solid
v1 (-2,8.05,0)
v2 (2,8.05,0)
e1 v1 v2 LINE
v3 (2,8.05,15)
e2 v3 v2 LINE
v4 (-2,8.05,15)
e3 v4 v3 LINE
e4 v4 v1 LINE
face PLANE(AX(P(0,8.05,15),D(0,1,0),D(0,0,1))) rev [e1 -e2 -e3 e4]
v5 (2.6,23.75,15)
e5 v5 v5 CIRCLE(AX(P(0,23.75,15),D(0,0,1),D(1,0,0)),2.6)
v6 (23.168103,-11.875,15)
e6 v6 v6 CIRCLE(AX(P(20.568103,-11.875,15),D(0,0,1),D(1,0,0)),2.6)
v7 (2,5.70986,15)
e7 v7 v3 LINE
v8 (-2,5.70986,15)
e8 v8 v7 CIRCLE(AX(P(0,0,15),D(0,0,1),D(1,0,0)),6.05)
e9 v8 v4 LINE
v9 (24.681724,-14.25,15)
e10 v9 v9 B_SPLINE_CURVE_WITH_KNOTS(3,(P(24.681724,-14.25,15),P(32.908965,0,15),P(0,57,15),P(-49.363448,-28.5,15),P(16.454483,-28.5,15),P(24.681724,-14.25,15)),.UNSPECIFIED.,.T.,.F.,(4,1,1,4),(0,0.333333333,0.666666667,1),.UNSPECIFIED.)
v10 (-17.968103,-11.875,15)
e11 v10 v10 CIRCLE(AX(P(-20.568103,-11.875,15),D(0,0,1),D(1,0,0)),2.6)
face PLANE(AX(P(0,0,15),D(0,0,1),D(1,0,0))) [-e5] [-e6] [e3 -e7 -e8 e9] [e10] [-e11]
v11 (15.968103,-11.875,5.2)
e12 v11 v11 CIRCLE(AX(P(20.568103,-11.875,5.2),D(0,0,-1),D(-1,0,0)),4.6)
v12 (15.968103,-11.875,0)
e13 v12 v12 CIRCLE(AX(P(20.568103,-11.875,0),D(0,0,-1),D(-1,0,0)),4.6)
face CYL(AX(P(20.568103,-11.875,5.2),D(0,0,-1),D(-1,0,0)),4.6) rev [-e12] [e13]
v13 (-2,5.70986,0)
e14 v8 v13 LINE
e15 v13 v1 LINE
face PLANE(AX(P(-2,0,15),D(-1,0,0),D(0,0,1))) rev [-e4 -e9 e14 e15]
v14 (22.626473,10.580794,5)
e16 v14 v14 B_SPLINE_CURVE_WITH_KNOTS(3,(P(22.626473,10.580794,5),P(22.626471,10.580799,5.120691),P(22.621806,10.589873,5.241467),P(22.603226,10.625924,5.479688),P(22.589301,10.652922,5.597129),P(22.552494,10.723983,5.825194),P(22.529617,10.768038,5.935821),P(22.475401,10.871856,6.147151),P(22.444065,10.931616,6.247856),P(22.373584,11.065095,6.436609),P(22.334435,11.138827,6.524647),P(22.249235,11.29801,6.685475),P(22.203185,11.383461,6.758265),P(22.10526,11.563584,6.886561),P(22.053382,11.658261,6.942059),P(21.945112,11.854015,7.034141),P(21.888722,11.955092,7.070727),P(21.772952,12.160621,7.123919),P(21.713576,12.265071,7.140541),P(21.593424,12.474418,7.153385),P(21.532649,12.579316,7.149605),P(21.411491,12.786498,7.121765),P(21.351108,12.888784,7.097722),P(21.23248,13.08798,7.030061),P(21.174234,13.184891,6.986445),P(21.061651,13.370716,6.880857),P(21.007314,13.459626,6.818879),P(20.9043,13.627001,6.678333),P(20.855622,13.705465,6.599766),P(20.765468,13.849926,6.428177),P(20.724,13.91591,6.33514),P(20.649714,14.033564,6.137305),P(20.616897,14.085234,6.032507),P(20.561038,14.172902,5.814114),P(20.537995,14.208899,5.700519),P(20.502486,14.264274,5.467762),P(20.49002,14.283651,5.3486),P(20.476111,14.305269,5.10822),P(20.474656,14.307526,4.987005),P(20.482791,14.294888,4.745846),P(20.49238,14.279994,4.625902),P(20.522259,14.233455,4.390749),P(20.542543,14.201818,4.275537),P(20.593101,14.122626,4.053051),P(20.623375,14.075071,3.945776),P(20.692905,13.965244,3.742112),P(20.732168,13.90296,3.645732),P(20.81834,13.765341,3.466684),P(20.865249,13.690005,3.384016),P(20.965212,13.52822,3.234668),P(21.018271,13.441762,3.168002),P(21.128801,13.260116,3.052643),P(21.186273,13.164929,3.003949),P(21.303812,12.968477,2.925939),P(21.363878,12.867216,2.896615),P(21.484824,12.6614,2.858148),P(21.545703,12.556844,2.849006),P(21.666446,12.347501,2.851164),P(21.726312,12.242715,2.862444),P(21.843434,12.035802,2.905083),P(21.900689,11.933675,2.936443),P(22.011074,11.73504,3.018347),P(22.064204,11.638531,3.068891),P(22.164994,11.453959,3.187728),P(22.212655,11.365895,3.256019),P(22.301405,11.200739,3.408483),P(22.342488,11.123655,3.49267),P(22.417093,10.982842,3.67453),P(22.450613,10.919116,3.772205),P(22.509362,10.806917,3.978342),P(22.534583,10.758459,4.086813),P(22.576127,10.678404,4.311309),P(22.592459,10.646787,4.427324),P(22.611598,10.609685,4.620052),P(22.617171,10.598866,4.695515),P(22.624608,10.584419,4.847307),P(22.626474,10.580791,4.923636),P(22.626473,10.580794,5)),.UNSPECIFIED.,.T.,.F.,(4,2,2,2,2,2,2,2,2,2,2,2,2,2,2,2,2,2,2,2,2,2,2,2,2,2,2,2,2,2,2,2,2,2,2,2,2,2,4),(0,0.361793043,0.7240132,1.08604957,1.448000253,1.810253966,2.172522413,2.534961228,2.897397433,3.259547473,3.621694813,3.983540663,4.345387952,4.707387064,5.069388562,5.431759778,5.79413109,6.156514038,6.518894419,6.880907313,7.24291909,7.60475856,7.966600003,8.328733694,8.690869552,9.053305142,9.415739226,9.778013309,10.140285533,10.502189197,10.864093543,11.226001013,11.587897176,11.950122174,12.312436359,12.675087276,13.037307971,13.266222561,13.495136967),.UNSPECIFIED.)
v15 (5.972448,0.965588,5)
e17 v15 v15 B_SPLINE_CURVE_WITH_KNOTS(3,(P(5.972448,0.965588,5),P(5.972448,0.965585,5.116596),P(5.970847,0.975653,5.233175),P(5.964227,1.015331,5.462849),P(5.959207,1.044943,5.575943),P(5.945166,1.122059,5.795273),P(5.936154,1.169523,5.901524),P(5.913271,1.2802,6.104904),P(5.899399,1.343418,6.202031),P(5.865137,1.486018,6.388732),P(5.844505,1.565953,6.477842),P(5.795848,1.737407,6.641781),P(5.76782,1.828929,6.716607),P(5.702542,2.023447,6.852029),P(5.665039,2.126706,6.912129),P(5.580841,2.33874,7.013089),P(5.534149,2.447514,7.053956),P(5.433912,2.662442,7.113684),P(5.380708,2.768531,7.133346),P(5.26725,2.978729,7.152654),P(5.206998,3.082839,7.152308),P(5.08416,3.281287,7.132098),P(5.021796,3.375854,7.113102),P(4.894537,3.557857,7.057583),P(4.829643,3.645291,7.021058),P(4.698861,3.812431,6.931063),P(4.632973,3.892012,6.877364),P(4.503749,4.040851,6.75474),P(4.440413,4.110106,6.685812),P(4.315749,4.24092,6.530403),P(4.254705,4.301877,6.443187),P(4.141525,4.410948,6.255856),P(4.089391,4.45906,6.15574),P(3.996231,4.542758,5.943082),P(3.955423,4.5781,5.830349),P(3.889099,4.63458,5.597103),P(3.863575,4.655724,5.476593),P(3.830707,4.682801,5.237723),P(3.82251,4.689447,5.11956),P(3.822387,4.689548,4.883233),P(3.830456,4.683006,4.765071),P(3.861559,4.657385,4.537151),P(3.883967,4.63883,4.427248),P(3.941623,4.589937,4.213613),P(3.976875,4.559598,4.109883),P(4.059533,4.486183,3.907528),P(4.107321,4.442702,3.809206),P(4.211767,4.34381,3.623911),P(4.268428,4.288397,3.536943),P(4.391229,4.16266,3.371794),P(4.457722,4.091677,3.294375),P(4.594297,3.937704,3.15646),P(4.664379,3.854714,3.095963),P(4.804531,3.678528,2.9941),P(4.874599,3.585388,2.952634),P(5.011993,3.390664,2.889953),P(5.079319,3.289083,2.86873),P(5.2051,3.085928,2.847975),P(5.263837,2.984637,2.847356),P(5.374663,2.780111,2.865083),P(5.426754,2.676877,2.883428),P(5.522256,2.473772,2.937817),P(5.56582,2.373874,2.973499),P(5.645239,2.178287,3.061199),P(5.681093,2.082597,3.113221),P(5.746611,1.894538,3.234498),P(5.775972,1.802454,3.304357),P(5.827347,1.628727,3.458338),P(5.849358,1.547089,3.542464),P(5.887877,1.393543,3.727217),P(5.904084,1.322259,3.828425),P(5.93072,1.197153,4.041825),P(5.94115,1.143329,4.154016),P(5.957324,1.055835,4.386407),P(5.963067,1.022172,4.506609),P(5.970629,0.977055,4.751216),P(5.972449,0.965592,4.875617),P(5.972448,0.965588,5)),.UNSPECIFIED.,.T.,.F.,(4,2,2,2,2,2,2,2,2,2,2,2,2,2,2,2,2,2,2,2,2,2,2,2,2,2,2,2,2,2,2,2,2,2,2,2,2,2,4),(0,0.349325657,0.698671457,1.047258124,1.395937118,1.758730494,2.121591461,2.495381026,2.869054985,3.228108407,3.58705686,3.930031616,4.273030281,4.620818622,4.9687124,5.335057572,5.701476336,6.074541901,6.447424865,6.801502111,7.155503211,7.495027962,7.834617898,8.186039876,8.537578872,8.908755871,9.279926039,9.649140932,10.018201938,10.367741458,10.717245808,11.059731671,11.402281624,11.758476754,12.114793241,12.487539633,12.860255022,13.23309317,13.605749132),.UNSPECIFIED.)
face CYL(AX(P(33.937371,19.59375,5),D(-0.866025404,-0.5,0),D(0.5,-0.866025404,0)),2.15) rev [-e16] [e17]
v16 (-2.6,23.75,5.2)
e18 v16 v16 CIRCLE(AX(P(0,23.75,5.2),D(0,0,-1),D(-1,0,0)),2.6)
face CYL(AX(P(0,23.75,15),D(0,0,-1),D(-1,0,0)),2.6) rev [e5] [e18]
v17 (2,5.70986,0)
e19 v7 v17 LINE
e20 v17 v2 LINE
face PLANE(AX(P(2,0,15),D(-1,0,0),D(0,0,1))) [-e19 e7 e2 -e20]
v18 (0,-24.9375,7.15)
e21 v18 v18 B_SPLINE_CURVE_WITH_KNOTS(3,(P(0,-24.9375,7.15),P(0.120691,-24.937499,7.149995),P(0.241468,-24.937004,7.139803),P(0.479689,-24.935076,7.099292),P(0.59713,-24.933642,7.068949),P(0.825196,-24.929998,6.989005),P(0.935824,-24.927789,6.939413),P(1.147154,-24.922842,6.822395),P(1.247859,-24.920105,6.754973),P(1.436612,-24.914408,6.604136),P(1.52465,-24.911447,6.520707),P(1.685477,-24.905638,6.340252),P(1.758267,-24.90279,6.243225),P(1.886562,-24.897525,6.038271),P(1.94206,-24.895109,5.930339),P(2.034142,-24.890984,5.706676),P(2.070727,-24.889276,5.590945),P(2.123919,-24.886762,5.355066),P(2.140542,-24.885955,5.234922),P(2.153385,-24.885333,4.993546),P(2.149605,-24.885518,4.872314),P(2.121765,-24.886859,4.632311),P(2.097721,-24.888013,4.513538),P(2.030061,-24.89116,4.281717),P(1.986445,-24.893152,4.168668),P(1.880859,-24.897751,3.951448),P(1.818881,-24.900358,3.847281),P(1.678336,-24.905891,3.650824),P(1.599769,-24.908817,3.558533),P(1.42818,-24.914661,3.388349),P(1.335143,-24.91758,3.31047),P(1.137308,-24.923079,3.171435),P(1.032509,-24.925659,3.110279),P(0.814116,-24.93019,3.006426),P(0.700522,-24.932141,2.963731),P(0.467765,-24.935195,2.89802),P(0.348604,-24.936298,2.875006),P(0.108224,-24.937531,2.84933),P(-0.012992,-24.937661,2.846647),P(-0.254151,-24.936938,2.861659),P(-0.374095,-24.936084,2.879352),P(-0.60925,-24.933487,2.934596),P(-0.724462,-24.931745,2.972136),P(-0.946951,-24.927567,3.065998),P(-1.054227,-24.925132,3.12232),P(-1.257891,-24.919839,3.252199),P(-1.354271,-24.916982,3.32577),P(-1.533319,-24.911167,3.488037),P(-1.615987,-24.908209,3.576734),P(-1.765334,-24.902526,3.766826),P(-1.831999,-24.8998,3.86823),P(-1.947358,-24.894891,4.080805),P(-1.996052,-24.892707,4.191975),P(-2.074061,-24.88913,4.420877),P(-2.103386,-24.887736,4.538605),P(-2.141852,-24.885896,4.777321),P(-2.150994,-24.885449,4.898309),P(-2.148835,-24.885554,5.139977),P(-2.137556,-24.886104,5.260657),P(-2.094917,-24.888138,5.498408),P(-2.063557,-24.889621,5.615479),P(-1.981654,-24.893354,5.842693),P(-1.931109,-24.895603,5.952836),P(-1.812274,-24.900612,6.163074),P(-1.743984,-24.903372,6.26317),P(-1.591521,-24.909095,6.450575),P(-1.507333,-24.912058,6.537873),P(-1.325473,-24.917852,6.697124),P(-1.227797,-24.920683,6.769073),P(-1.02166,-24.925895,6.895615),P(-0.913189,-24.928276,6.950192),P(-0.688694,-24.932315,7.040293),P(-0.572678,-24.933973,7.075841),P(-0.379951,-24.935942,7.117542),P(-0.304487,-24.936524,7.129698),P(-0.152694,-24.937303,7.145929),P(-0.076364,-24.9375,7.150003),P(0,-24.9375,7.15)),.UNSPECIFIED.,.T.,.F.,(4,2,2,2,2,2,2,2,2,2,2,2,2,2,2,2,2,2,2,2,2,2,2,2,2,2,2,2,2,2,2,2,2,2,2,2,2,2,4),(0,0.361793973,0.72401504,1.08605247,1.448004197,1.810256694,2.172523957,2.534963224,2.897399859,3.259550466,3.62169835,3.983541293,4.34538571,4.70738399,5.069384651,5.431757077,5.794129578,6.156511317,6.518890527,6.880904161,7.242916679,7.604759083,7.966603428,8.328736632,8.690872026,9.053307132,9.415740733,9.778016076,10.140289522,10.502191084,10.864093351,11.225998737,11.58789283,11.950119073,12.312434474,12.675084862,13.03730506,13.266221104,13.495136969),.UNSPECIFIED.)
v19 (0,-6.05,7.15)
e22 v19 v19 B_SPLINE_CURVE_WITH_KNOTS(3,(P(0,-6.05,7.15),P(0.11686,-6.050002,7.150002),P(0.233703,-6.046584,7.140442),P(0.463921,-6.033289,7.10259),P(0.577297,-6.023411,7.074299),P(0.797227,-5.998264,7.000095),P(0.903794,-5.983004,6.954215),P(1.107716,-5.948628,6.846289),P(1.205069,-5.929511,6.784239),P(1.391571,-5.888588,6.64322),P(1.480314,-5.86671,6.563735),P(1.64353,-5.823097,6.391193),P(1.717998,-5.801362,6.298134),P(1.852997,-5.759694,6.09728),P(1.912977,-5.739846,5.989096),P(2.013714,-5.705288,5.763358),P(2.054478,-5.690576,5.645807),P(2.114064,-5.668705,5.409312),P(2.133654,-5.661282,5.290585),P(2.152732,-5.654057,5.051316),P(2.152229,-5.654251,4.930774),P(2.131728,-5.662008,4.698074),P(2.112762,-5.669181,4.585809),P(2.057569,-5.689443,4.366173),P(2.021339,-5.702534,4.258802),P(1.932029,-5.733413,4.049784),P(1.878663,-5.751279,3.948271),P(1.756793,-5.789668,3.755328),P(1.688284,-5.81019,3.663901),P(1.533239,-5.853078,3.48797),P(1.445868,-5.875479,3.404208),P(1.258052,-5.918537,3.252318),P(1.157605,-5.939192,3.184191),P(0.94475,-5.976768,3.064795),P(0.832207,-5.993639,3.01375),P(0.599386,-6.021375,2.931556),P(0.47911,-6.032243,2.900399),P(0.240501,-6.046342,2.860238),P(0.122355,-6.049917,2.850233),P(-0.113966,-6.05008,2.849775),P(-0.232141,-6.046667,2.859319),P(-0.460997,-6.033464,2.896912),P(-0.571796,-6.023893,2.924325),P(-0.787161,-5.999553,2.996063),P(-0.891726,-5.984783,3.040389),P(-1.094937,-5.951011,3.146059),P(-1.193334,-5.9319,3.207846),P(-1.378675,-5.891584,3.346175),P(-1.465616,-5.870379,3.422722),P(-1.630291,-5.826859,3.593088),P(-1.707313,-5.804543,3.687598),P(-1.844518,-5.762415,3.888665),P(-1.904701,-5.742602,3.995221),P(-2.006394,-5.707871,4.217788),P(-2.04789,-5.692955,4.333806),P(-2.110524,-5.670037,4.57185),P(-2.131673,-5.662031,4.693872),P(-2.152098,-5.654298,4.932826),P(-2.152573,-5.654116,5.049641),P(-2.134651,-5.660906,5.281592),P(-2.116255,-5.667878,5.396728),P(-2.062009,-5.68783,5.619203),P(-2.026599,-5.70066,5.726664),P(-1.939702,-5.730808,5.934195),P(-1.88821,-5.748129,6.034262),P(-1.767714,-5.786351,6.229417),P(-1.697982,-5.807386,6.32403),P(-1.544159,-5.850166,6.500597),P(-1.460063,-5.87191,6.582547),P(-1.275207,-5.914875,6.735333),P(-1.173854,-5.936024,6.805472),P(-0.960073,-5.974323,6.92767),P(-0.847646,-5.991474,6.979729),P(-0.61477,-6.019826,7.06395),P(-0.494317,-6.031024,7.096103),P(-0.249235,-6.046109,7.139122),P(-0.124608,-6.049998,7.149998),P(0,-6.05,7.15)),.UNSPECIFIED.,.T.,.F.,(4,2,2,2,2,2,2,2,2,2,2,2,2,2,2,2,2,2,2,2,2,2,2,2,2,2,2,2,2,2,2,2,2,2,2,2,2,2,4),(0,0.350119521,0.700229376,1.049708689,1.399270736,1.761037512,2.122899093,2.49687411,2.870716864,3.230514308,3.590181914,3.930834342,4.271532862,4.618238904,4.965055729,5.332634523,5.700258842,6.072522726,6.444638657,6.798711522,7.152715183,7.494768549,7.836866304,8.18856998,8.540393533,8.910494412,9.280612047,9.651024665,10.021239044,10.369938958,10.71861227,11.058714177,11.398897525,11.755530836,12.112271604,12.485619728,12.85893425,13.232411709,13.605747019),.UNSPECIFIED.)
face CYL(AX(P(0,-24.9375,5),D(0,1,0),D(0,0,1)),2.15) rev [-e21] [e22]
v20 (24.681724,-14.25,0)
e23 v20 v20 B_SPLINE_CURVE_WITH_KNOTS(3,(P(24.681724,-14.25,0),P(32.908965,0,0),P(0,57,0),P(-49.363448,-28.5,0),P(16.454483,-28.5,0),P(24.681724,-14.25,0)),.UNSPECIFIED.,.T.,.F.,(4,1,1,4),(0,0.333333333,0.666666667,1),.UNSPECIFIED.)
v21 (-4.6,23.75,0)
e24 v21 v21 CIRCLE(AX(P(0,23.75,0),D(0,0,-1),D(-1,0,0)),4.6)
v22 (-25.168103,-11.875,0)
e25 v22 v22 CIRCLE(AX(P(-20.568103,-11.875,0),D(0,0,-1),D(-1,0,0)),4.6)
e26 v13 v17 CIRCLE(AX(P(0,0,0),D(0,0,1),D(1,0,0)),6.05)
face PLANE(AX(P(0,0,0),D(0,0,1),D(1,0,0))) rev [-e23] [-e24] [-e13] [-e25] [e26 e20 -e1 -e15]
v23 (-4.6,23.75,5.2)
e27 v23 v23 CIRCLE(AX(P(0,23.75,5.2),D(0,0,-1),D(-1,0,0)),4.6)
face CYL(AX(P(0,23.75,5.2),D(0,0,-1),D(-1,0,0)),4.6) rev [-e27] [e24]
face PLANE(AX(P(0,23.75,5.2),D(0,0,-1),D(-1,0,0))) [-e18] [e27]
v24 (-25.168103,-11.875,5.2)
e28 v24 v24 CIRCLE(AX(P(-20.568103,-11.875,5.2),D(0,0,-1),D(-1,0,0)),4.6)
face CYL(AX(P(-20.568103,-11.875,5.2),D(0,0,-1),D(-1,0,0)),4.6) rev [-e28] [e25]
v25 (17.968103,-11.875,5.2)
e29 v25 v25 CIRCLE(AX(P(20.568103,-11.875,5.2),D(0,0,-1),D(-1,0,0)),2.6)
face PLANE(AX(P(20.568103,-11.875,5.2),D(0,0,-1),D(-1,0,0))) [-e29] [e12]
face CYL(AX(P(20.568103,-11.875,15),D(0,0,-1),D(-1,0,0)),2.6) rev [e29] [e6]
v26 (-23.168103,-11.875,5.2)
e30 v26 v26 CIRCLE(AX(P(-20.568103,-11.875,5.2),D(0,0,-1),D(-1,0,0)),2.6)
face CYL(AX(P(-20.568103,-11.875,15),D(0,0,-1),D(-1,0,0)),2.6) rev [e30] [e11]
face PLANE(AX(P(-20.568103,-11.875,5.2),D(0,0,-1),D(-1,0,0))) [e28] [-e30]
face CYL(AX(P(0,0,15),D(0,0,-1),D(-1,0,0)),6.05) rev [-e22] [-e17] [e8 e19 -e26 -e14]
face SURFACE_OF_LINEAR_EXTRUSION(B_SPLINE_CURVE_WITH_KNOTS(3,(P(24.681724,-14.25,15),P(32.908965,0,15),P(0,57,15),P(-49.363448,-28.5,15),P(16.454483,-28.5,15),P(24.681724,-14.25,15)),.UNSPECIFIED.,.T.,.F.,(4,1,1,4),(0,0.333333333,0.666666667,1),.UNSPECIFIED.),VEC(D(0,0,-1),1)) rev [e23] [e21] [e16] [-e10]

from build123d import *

# Parameters (mm, degrees)
SKETCH_1_R           = 2.6
EXTRUDE_1_DEPTH      = 15
SKETCH_13_R          = 2.15
CUT_EXTRUDE_10_DEPTH = 42.943414433
SKETCH_14_R          = 2.15
CUT_EXTRUDE_11_DEPTH = 42.943414433
SKETCH_15_R          = 4.6
CUT_EXTRUDE_12_DEPTH = 5.2


with BuildPart() as part:
    # ｽｹｯﾁ1 → ﾎﾞｽ - 押し出し1 (new body)
    with BuildSketch(Plane.XY):
        with BuildLine():
            add(Edge.make_bspline(
                [(24.681724008, -14.25), (32.908965344, 0), (-1.1e-08, 56.999999981), (-49.363447804, -28.499999633), (16.454482294, -28.500000089), (24.681724008, -14.25)],
                knots=[0, 0, 0, 0, 0.333333333, 0.666666668, 0.999999999, 0.999999999, 0.999999999, 0.999999999], degree=3))
        make_face()
        with Locations((-20.56810334, -11.875)):
            Circle(SKETCH_1_R, mode=Mode.SUBTRACT)
        with BuildLine():
            Line((-2, 5.709859893), (-2, 8.05))
            Line((-2, 8.05), (2, 8.05))
            Line((2, 8.05), (2, 5.709859893))
            ThreePointArc((2, 5.709859893), (0, -6.05), (-2, 5.709859893))
        make_face(mode=Mode.SUBTRACT)
        with Locations((0, 23.75)):
            Circle(SKETCH_1_R, mode=Mode.SUBTRACT)
        with Locations((20.56810334, -11.875)):
            Circle(SKETCH_1_R, mode=Mode.SUBTRACT)
    extrude(amount=EXTRUDE_1_DEPTH)

    # ｽｹｯﾁ13 → ｶｯﾄ - 押し出し10 (cut, through all)
    with BuildSketch(Plane(origin=(0, 0, 0), x_dir=(1, 0, 0), z_dir=(0, 1, 0))):
        with Locations((0, -5)):
            Circle(SKETCH_13_R)
    extrude(amount=-CUT_EXTRUDE_10_DEPTH, mode=Mode.SUBTRACT)

    # ｽｹｯﾁ14 → ｶｯﾄ - 押し出し11 (cut, through all)
    with BuildSketch(Plane(origin=(0, 0, 0), x_dir=(0, 0, 1), z_dir=(-0.8660254037844364, -0.5000000000000041, 0))):
        with Locations((5, 0)):
            Circle(SKETCH_14_R)
    extrude(amount=-CUT_EXTRUDE_11_DEPTH, mode=Mode.SUBTRACT)

    # ｽｹｯﾁ15 → ｶｯﾄ - 押し出し12 (cut)
    with BuildSketch(Plane(origin=(0, 0, 0), x_dir=(-1, 0, 0), z_dir=(0, 0, -1))):
        with Locations((-20.56810334, -11.875)):
            Circle(SKETCH_15_R)
        with Locations((0, 23.75)):
            Circle(SKETCH_15_R)
        with Locations((20.56810334, -11.875)):
            Circle(SKETCH_15_R)
    extrude(amount=-CUT_EXTRUDE_12_DEPTH, mode=Mode.SUBTRACT)


solid = part.part
